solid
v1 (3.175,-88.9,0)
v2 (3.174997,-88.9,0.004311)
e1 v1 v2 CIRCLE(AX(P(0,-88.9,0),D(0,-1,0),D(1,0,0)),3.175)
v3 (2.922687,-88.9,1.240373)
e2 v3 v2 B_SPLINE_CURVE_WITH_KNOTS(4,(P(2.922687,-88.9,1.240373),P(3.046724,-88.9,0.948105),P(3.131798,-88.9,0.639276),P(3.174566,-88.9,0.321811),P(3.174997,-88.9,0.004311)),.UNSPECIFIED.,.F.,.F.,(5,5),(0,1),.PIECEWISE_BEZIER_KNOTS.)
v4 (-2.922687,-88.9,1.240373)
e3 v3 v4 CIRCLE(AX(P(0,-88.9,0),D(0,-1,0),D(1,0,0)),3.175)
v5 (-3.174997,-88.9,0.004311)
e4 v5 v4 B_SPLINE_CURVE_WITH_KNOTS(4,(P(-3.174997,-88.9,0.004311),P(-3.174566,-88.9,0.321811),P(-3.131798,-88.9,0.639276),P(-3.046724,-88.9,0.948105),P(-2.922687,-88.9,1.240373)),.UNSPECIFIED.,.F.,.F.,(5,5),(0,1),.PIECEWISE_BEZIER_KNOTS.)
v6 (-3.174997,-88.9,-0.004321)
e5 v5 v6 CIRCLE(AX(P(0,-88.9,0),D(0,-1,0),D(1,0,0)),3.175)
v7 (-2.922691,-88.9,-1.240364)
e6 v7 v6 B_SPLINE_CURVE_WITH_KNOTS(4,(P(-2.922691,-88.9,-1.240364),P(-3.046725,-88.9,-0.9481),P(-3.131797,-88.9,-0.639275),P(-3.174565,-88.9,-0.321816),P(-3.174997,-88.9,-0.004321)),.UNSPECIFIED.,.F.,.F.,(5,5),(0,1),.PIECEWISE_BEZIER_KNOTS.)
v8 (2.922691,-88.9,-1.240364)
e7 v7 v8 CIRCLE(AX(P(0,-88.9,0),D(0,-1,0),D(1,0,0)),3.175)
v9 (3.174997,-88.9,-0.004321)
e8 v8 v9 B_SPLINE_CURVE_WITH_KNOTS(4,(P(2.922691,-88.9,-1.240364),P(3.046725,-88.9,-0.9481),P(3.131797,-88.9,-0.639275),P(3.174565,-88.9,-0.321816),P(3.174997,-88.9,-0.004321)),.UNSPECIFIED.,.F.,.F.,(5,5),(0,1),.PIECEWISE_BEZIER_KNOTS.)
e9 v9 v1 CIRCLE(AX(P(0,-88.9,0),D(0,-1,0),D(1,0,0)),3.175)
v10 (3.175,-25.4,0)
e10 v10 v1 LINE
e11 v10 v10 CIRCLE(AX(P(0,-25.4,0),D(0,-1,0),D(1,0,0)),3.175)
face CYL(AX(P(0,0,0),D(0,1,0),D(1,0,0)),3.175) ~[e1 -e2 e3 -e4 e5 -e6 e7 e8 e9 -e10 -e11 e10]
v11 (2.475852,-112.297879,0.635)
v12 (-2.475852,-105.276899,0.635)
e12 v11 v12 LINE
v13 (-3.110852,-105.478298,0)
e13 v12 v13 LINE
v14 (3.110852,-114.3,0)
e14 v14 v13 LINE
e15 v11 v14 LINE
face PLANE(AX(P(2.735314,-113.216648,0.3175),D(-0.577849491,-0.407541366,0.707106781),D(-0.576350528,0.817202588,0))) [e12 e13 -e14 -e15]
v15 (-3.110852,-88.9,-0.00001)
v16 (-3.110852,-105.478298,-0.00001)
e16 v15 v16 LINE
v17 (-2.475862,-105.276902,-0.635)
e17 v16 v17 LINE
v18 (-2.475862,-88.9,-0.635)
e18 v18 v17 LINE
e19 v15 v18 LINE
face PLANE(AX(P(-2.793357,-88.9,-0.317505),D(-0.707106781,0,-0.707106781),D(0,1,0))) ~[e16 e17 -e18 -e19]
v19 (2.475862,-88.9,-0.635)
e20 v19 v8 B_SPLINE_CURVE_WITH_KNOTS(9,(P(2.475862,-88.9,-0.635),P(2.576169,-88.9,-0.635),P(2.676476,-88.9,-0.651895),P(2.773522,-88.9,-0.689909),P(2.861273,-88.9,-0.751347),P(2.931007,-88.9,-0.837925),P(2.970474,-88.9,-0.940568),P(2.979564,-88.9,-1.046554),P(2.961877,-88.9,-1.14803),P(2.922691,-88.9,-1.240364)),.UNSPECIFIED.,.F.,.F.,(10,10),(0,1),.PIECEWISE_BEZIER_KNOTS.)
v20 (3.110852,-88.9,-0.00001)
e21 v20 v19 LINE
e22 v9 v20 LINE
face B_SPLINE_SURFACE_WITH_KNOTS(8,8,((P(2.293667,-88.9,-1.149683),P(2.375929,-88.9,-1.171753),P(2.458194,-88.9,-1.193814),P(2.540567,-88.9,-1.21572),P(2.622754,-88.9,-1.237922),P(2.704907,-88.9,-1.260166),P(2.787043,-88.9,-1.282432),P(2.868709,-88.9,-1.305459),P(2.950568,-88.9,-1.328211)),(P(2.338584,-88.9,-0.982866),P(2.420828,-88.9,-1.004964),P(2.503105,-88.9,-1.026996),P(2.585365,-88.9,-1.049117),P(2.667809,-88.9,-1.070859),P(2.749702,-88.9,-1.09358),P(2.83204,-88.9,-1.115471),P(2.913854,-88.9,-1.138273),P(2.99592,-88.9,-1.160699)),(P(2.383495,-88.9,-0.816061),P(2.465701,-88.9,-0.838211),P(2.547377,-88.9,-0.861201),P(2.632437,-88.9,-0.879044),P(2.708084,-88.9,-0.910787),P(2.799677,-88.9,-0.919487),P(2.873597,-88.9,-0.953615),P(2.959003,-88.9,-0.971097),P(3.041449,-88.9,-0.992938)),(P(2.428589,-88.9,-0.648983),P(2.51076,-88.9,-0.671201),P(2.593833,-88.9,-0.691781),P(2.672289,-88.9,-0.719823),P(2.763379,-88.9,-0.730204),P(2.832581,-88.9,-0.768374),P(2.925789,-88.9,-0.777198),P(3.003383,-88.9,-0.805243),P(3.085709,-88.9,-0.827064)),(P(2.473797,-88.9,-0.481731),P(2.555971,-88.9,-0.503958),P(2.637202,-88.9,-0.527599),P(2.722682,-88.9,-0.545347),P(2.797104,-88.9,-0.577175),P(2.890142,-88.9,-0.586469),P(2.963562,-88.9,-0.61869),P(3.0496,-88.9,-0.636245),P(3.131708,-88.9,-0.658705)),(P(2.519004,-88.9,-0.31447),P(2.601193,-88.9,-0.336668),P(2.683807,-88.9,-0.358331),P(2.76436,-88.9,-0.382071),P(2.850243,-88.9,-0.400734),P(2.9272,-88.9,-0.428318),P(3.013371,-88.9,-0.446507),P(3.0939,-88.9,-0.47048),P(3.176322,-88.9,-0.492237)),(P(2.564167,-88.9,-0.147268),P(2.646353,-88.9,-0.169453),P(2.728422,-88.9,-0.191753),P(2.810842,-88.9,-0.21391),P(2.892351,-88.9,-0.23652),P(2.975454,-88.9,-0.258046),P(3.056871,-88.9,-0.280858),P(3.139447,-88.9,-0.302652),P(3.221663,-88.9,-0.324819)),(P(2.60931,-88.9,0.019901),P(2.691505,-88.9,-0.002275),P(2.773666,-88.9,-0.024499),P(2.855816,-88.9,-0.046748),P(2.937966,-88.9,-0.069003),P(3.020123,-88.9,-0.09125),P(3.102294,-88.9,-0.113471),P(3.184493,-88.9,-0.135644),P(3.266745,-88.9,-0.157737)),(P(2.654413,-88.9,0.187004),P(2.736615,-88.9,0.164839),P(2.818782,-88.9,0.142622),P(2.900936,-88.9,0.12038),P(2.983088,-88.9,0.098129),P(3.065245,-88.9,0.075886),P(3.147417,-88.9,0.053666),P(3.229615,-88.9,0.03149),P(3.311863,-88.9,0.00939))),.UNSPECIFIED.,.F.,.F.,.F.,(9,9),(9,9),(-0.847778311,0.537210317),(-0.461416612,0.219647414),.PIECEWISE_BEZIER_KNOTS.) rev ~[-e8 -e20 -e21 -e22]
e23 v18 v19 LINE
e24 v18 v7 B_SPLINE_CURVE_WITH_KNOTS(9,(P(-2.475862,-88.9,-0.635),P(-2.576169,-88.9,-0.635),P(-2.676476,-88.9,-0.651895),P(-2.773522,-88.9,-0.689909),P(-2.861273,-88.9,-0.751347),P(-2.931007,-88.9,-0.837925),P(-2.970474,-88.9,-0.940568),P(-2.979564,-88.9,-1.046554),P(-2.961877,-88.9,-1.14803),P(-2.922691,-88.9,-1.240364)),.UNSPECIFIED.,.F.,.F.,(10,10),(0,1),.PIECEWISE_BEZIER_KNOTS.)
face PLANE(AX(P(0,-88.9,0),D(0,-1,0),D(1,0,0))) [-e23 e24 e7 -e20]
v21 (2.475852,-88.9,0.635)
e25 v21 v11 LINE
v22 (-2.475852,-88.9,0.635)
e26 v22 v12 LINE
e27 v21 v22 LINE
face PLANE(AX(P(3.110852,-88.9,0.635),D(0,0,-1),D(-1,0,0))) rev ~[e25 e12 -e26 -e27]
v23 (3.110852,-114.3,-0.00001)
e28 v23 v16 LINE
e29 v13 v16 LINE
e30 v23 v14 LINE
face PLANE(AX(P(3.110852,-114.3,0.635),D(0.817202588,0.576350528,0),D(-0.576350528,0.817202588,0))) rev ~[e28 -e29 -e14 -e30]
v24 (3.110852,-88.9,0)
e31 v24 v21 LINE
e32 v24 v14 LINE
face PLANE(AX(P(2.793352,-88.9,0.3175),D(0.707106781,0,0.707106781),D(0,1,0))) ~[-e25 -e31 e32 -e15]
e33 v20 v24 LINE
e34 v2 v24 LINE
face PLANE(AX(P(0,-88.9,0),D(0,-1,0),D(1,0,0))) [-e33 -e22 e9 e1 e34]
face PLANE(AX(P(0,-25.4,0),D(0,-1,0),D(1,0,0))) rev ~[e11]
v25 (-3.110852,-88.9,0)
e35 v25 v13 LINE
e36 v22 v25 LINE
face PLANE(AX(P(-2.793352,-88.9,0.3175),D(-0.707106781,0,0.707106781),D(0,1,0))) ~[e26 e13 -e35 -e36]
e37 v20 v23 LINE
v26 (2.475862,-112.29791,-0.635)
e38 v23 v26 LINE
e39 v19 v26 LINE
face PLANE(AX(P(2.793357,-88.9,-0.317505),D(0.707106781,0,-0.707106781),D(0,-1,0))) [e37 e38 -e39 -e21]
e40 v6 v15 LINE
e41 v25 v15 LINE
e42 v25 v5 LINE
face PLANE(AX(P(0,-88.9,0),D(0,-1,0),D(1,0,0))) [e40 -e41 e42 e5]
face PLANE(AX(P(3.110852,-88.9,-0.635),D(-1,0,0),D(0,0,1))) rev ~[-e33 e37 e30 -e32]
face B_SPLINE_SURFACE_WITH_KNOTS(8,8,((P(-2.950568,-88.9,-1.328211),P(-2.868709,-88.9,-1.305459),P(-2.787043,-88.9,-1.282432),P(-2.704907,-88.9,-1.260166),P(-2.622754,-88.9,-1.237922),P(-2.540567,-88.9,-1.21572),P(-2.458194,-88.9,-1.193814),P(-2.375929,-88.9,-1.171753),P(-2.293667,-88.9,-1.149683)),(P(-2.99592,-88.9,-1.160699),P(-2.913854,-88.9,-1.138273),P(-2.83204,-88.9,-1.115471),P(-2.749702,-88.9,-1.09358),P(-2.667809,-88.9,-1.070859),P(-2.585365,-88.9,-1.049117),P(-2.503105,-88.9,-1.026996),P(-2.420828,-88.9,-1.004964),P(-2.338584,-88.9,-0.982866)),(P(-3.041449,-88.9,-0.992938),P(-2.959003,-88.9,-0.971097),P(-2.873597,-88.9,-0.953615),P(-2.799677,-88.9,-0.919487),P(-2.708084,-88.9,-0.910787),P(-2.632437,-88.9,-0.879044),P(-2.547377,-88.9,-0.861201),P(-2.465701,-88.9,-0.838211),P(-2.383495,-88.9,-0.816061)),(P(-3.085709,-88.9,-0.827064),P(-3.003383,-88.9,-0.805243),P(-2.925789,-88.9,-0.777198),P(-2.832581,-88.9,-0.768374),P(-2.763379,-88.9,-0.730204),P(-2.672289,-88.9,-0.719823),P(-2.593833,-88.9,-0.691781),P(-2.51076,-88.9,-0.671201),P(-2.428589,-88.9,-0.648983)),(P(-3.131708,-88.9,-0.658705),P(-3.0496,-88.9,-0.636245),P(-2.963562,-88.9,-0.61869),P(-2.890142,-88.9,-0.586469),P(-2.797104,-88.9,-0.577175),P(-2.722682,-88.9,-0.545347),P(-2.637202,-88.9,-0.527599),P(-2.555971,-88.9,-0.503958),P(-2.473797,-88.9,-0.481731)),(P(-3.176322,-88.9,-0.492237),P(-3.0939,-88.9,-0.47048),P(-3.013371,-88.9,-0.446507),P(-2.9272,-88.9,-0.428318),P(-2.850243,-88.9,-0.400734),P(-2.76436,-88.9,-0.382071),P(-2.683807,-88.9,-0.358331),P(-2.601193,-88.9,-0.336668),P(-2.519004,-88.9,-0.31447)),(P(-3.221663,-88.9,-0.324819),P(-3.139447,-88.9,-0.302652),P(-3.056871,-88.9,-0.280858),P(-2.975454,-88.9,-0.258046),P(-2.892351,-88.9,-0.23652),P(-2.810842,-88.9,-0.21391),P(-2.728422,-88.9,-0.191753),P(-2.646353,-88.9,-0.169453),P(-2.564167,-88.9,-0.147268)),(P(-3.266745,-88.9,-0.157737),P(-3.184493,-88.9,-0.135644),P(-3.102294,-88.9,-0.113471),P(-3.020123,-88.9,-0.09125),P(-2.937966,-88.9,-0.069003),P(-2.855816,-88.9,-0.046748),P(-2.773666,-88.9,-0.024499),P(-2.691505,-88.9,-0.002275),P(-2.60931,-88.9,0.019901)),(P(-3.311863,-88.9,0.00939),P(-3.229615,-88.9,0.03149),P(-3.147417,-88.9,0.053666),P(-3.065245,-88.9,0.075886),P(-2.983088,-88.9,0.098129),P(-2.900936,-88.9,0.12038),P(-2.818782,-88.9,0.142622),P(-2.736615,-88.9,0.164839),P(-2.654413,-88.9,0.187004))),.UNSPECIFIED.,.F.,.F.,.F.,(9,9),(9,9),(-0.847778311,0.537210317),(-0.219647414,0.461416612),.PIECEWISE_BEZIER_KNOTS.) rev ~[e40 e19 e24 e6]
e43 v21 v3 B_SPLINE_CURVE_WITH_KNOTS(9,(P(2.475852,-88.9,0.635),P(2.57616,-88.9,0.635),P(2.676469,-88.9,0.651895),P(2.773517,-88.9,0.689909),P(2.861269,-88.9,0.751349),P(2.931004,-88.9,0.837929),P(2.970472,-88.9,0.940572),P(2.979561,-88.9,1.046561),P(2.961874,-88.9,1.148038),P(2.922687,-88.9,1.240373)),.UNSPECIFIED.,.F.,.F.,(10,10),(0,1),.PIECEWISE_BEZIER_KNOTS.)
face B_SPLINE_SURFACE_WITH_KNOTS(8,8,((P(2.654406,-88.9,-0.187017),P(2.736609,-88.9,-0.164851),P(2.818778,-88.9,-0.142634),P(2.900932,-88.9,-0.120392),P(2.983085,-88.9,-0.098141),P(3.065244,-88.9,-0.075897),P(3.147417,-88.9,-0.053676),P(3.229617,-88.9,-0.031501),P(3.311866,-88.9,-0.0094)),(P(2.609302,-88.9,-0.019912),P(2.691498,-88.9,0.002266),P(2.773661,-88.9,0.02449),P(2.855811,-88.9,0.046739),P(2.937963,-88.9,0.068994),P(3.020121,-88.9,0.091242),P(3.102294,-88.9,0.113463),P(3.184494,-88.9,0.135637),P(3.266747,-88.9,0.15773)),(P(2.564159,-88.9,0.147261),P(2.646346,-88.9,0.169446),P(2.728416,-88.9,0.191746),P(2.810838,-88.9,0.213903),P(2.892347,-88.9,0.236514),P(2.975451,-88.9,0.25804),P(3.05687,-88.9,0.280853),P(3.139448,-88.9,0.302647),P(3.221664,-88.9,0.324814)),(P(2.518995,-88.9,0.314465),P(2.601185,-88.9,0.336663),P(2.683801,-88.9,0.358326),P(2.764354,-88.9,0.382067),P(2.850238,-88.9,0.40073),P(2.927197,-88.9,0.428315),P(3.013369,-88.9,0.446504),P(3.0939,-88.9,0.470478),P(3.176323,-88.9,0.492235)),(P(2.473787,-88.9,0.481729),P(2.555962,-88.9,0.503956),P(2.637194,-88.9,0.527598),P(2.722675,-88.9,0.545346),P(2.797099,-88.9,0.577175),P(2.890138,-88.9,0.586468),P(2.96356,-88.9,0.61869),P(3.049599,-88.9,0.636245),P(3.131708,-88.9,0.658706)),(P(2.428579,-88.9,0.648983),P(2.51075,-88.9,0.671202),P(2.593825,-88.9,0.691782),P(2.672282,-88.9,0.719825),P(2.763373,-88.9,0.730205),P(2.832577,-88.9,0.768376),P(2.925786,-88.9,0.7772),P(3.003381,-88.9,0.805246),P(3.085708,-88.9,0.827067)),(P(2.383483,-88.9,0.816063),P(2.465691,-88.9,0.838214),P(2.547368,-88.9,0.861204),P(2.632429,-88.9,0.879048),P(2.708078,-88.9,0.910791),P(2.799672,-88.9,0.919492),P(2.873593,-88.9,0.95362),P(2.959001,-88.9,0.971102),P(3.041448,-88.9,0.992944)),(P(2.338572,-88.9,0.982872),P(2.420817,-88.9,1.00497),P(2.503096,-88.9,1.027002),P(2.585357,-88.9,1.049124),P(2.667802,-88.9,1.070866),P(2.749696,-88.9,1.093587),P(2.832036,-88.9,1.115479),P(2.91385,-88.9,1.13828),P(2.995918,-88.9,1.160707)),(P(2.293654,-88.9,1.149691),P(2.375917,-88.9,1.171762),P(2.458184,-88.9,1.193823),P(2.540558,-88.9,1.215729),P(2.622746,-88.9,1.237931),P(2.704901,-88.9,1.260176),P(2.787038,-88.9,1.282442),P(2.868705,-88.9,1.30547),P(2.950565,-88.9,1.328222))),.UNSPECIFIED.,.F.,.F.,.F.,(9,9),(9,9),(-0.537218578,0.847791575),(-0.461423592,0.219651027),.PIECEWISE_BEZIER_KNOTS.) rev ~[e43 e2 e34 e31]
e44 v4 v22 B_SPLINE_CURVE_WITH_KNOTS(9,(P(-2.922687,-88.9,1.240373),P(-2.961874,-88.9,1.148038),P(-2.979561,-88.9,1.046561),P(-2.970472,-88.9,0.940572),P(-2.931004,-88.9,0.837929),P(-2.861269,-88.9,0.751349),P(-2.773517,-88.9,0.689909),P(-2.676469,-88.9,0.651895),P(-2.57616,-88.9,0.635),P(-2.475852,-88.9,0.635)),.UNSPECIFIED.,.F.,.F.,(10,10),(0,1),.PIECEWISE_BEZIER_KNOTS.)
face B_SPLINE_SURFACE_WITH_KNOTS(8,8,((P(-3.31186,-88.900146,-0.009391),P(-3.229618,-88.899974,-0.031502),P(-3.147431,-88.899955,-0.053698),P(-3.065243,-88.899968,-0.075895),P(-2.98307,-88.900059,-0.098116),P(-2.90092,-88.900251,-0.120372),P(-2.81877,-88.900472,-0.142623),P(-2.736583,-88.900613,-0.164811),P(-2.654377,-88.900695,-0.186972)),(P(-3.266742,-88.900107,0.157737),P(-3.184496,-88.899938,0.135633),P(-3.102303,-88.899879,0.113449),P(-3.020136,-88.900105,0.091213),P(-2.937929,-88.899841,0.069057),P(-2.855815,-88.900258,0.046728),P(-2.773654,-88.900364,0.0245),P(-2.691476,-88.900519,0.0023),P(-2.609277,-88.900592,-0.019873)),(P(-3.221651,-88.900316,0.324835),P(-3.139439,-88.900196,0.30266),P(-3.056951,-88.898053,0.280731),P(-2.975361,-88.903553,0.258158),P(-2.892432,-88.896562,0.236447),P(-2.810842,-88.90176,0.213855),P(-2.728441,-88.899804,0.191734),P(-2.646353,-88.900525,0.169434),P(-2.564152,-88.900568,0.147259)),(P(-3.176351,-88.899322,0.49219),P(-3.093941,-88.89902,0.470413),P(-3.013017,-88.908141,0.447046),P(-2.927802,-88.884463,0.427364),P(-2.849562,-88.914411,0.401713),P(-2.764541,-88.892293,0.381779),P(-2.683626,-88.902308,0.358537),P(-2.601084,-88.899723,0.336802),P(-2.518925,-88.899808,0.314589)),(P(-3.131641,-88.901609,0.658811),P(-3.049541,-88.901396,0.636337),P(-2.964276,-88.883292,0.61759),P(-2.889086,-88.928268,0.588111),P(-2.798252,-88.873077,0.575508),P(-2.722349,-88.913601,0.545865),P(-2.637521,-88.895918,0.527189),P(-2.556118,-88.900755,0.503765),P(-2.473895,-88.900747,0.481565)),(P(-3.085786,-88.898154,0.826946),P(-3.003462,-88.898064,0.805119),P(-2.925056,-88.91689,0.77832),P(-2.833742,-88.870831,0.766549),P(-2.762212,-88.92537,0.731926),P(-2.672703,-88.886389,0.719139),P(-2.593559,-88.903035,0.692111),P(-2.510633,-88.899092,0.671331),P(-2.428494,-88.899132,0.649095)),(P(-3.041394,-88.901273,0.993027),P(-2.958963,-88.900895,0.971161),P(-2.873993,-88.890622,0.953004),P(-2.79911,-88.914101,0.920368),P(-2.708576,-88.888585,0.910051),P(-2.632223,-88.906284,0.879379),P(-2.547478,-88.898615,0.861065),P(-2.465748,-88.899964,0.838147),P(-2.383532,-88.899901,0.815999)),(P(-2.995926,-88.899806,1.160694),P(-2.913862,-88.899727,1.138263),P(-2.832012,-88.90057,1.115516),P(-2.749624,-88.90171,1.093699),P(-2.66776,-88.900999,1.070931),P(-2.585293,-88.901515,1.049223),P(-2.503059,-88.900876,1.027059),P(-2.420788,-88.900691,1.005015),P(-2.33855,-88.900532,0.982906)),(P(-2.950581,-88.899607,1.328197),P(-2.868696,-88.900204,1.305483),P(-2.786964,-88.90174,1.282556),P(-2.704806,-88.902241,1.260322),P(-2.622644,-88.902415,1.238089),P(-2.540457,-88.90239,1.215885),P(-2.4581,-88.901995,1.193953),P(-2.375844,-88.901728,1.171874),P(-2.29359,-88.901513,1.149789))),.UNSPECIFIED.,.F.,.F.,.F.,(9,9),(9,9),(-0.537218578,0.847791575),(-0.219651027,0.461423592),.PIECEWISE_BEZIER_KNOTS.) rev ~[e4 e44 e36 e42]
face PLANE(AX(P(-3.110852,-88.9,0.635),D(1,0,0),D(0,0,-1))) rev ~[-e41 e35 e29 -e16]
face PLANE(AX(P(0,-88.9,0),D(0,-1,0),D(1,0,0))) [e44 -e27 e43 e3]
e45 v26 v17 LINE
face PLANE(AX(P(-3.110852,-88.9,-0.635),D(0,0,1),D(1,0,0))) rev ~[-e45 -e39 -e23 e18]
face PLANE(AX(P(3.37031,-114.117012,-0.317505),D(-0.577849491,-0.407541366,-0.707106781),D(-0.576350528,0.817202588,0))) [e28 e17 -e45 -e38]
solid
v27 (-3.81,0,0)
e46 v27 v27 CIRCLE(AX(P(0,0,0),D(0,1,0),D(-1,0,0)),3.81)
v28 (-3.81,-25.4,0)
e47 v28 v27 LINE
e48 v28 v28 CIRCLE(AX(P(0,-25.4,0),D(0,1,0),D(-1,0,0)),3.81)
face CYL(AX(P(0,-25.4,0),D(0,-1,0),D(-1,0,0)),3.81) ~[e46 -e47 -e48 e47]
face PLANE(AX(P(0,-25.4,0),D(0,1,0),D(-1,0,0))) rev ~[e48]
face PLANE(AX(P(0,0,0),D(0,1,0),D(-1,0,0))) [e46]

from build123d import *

# Parameters (mm, degrees)
F0_R       = 3.175
F1_DEPTH   = 88.9
F3_DEPTH   = 25.4
F5_DEPTH   = 25.4
F6_C1_SIZE = 0.635
F6_C2_SIZE = 0.635
F6_C3_SIZE = 0.635
F7_SIZE    = 0.63499
F8_DEPTH   = 25.4
F9_R       = 3.81
F9_R_2     = 3.175
F10_DEPTH  = 25.4


# Not quite as in the source:
# - a fillet or chamfer is up to 0.001 mm smaller than in the source, because OpenCascade refuses the exact size


with BuildPart() as f1:
    # F0 (on Front) → F1 (new body)
    with BuildSketch(Plane.XZ):
        Circle(F0_R)
    extrude(amount=F1_DEPTH)

    # F2 (on face) → F3 (join)
    with BuildSketch(Plane.XZ.offset(88.9)):
        Polygon((-1.5875, -0.635), (0, -0.635), (0, 0), (0, 0.635), (-1.5875, 0.635), (-3.1108519733, 0.635), (-3.1108519733, -0.635), align=None)
        Polygon((0, 0), (0, -0.635), (3.1108519733, -0.635), (3.1108519733, 0.635), (0, 0.635), align=None)
    extrude(amount=F3_DEPTH)

    # F4 (on face) → F5 (cut)
    with BuildSketch(Plane.XY.offset(0.635)):
        Polygon((-3.1108519733, -114.3), (3.1108519733, -114.3), (-3.1108519733, -105.4782980667), align=None)
    extrude(amount=-F5_DEPTH, mode=Mode.SUBTRACT)

    # F6: chamfer of 0.635 on 3 edges, made by hand

    # F6_c1
    f6_c1_edges = [f1.edges().sort_by_distance(p)[0] for p in [
        (3.1108519733, -101.6, 0.635),
    ]]
    chamfer(f6_c1_edges, length=F6_C1_SIZE)

    # F6_c2
    f6_c2_edges = [f1.edges().sort_by_distance(p)[0] for p in [
        (-3.1108519733, -97.1891490333, 0.635),
    ]]
    chamfer(f6_c2_edges, length=F6_C2_SIZE)

    # F6_c3
    f6_c3_edges = [f1.edges().sort_by_distance(p)[0] for p in [
        (0, -109.8891490333, 0.635),
    ]]
    chamfer(f6_c3_edges, length=F6_C3_SIZE)

    # F7 (size 0.635 in the source; OpenCascade refuses exactly that, so slightly less here)
    f7_edges = [f1.edges().sort_by_distance(p)[0] for p in [
        (0, -109.889149, -0.635),
        (-3.110852, -97.189149, -0.635),
        (3.110852, -101.6, -0.635),
    ]]
    chamfer(f7_edges, length=F7_SIZE)

    # F8 (cut): a face of the model
    f8_faces = [f1.faces().sort_by_distance(p)[0] for p in [
        (0, 0, 0),
    ]]
    extrude(f8_faces, amount=-F8_DEPTH, mode=Mode.SUBTRACT)


with BuildPart() as f10:
    # F9 (on face) → F10 (new body)
    with BuildSketch(Plane(origin=(0, -25.4, 0), x_dir=(-1, 0, 0), z_dir=(0, 1, 0))):
        Circle(F9_R)
        Circle(F9_R_2, mode=Mode.SUBTRACT)
        Circle(F9_R_2)
    extrude(amount=F10_DEPTH)


solid = Compound([f1.part, f10.part])
